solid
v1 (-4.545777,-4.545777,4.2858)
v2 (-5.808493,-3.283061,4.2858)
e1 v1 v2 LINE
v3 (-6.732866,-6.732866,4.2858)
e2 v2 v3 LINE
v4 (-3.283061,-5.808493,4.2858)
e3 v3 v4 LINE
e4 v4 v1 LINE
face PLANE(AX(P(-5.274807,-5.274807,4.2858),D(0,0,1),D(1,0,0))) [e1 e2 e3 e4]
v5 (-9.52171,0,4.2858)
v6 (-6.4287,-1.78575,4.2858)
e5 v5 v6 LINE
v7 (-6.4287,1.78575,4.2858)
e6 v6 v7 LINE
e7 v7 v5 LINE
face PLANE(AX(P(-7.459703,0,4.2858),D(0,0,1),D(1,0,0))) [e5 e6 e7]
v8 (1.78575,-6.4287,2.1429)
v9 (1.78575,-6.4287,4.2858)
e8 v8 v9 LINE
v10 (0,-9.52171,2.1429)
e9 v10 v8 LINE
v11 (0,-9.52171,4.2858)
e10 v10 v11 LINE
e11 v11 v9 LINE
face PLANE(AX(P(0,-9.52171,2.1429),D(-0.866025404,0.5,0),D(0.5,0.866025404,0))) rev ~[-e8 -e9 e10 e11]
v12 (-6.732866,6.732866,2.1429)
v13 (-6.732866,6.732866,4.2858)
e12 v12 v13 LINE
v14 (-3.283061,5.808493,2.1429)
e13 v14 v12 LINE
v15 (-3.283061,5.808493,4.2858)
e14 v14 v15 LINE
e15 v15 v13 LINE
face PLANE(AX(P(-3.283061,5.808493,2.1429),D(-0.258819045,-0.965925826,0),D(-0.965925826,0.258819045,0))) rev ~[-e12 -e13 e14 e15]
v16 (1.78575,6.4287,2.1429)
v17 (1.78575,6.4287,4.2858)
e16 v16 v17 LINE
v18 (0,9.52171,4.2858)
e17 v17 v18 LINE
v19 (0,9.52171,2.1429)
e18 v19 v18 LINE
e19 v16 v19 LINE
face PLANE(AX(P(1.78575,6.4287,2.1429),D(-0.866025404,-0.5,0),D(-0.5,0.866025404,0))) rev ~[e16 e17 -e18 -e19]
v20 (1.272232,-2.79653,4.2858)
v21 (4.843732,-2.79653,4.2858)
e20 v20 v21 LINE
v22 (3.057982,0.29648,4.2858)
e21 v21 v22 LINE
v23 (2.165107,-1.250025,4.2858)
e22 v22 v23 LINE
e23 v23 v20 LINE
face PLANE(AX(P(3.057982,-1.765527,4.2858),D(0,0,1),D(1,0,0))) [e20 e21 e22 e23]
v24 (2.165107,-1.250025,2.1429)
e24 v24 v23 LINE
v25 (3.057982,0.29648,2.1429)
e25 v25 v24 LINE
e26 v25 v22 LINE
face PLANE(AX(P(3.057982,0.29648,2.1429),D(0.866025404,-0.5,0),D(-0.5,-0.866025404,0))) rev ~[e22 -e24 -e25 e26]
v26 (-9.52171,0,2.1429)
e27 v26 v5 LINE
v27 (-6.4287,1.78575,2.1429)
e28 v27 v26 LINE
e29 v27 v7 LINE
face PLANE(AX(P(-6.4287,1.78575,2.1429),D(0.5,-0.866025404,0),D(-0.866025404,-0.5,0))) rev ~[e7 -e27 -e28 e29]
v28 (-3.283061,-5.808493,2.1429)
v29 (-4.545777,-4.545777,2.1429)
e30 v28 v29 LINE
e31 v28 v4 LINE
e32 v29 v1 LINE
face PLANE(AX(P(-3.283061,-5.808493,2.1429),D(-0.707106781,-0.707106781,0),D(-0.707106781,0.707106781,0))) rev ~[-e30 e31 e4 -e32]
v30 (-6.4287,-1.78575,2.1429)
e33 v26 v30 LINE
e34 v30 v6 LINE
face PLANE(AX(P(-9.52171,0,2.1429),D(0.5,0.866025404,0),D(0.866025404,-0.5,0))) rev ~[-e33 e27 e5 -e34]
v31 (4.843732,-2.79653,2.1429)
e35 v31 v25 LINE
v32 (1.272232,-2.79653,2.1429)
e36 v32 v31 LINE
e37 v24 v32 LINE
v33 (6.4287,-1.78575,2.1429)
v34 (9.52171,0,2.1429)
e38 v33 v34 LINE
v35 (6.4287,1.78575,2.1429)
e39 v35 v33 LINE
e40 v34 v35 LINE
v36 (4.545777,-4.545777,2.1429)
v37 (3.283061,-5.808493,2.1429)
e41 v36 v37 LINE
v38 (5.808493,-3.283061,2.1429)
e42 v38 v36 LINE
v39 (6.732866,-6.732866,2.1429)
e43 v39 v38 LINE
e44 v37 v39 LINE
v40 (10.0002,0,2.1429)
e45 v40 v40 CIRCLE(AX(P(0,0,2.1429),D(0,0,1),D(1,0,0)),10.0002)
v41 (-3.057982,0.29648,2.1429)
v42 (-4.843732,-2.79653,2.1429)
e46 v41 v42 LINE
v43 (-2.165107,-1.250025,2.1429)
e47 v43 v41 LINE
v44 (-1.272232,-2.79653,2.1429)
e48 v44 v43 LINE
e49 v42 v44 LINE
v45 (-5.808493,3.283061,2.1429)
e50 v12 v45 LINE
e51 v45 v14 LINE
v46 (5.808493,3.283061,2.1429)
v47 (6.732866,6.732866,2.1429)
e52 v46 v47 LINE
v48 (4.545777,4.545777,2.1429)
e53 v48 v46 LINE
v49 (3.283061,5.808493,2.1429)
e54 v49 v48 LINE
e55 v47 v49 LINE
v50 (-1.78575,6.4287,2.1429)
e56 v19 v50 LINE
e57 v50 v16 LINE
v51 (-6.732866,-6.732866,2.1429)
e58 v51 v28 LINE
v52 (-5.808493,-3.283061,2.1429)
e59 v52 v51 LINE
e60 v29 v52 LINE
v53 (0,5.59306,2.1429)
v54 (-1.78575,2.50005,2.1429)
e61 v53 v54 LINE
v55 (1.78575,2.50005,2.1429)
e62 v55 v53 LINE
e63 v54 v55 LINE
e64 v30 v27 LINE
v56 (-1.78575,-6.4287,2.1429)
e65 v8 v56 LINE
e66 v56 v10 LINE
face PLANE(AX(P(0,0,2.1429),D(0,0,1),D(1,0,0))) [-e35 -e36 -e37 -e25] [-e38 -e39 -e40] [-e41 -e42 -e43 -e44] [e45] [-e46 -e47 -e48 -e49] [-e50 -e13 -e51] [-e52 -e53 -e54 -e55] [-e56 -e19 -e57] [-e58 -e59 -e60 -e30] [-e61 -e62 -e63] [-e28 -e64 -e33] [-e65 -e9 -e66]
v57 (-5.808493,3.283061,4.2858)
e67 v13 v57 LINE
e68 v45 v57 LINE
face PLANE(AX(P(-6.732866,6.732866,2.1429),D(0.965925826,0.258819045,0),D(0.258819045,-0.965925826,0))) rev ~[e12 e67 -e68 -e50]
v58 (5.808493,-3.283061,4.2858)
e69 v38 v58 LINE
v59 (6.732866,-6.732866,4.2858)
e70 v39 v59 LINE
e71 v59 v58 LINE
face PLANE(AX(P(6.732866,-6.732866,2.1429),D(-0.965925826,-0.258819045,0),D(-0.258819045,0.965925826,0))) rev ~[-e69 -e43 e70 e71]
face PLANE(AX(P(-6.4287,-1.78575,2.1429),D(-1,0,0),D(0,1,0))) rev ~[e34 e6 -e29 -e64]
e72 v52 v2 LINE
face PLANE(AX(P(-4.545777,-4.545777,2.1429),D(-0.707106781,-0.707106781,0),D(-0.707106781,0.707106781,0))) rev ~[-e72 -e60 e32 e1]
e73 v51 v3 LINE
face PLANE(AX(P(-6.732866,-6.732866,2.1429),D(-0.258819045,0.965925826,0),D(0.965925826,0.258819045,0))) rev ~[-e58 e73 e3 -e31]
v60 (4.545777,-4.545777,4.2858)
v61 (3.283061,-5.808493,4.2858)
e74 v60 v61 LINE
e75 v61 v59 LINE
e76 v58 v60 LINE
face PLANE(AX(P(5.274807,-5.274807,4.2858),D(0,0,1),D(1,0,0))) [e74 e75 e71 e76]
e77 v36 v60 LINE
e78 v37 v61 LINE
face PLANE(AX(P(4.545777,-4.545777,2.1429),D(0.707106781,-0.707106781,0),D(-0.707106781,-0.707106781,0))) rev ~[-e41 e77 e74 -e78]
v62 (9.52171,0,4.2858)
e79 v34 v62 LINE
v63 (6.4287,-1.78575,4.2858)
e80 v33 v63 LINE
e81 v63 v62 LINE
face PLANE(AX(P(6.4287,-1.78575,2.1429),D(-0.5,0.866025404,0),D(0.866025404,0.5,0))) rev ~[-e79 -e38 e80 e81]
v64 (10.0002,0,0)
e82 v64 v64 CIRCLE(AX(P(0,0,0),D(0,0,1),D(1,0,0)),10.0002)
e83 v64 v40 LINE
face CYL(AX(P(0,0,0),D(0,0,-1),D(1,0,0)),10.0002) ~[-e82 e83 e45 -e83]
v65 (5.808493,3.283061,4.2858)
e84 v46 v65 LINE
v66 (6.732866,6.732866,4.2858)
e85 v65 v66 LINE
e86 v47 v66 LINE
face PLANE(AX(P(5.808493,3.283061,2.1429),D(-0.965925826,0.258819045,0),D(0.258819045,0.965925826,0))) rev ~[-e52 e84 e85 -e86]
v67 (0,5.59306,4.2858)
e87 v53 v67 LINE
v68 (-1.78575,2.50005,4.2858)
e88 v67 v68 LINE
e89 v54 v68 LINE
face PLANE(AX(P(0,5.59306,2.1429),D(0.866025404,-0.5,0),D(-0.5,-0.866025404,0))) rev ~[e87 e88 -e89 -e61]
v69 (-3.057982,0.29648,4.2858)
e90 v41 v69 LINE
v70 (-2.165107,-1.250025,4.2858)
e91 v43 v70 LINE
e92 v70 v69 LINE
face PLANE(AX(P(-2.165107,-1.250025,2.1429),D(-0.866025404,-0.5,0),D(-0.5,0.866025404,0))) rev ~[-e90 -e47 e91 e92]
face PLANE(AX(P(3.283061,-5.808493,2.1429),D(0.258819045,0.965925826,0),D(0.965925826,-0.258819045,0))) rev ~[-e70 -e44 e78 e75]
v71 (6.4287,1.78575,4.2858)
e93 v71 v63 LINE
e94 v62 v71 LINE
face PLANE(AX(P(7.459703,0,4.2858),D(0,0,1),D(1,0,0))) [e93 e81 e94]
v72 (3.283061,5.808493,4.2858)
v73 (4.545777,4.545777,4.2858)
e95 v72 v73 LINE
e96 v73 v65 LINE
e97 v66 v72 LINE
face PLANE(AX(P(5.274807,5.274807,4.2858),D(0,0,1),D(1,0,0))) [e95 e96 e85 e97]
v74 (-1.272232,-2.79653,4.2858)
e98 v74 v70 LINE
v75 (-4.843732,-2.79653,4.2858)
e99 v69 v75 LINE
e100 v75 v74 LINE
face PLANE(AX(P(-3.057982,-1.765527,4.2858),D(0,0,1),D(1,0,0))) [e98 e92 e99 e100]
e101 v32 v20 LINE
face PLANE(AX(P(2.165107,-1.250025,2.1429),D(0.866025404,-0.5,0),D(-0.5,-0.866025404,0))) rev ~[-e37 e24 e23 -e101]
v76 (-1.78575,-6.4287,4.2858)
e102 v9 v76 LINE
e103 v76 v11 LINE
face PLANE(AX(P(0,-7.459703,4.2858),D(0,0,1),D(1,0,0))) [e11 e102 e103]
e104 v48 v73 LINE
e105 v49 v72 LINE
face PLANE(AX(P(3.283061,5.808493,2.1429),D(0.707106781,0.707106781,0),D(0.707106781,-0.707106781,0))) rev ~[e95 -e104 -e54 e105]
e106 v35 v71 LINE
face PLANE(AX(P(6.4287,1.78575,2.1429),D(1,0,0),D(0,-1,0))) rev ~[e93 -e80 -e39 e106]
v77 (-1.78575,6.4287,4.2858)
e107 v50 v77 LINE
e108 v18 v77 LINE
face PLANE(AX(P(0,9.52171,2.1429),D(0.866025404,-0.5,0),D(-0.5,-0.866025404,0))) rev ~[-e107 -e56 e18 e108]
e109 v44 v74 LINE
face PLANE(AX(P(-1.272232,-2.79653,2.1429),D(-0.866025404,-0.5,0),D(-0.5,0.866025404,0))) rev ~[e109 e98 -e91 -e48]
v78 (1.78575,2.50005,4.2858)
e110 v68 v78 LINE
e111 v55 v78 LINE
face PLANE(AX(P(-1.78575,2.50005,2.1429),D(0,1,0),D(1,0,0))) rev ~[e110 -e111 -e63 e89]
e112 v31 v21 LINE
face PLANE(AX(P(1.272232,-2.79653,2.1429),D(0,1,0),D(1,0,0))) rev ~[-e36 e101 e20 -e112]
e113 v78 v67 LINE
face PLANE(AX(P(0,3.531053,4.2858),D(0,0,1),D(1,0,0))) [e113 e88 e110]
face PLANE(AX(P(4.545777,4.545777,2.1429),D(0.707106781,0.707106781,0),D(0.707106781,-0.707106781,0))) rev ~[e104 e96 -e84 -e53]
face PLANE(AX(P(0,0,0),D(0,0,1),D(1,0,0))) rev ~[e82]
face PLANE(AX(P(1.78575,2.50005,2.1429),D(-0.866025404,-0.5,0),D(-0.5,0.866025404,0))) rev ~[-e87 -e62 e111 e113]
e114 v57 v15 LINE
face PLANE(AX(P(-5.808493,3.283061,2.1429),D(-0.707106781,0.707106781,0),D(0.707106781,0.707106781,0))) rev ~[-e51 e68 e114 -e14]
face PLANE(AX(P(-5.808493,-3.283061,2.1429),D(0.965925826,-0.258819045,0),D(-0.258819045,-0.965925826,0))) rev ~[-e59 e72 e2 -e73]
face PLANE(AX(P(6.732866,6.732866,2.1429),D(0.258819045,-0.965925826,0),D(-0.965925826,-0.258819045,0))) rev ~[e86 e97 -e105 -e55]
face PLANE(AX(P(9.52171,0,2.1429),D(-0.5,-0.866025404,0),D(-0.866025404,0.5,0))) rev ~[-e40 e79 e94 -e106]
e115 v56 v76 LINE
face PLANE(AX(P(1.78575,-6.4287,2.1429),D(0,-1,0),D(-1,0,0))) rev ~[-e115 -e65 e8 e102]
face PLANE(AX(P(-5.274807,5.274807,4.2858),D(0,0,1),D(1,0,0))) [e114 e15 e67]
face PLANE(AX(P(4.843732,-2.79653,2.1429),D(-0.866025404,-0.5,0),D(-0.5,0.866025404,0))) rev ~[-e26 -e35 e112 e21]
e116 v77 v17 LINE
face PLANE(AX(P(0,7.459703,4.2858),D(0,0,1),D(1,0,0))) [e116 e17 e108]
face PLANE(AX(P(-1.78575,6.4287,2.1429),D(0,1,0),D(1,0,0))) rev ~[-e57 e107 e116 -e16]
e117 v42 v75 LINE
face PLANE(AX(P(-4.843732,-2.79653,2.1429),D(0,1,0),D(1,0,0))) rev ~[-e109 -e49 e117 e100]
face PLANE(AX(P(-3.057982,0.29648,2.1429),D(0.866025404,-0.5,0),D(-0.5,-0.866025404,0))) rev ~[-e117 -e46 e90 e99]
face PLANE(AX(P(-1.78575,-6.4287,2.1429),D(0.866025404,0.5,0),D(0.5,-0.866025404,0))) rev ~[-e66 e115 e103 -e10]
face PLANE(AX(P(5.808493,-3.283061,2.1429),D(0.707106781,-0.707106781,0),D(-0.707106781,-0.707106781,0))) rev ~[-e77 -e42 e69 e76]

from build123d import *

# Parameters (mm, degrees)
F0_R     = 14
F1_DEPTH = 3
F3_DEPTH = 3
F4_SCALE = 0.7143


# Not quite as in the source:
# - a feature names something its author has since deleted; it is built from what else it names


with BuildPart() as f1:
    # F0 (on Top) → F1 (new body)
    with BuildSketch(Plane.XY):
        Circle(F0_R)
    extrude(amount=F1_DEPTH)

    # F2 (on face) → F3 (join)
    with BuildSketch(Plane.XY.offset(3)):
        Polygon((0, 3.5), (2.5, 3.5), (0, 7.8301270189), (-2.5, 3.5), align=None)
        Polygon((-1.7810889132, -3.9150635095), (-3.0310888244, -1.7500001539), (-4.2810889132, 0.4150635095), (-6.7810889132, -3.9150635095), align=None)
        Polygon((4.2810889132, 0.4150635095), (3.0310888244, -1.7500001539), (1.7810889132, -3.9150635095), (6.7810889132, -3.9150635095), align=None)
        Polygon((-8.1317279836, 4.5961940777), (-6.3639610341, 6.3639610272), (-4.5961940777, 8.1317279836), (-9.4258232092, 9.4258232092), align=None)
        Polygon((0, 9), (2.5, 9), (0, 13.3301270189), (-2.5, 9), align=None)
        Polygon((4.5961940777, 8.1317279836), (6.3639610512, 6.3639610102), (8.1317279836, 4.5961940777), (9.4258232092, 9.4258232092), align=None)
        Polygon((9, 2.5), (9, 0), (9, -2.5), (13.3301270189, 0), align=None)
        Polygon((8.1317279836, -4.5961940777), (6.3639610307, -6.3639610307), (4.5961940777, -8.1317279836), (9.4258232092, -9.4258232092), align=None)
        Polygon((2.5, -9), (0, -9), (-2.5, -9), (0, -13.3301270189), align=None)
        Polygon((-4.5961940777, -8.1317279836), (-6.3639610486, -6.3639610128), (-8.1317279836, -4.5961940777), (-9.4258232092, -9.4258232092), align=None)
        Polygon((-9, -2.5), (-9, 0), (-9, 2.5), (-13.3301270189, 0), align=None)
    extrude(amount=F3_DEPTH)


with BuildPart() as f1_1:
    # F4: moved
    add(f1.part.scale(F4_SCALE))


solid = f1_1.part
